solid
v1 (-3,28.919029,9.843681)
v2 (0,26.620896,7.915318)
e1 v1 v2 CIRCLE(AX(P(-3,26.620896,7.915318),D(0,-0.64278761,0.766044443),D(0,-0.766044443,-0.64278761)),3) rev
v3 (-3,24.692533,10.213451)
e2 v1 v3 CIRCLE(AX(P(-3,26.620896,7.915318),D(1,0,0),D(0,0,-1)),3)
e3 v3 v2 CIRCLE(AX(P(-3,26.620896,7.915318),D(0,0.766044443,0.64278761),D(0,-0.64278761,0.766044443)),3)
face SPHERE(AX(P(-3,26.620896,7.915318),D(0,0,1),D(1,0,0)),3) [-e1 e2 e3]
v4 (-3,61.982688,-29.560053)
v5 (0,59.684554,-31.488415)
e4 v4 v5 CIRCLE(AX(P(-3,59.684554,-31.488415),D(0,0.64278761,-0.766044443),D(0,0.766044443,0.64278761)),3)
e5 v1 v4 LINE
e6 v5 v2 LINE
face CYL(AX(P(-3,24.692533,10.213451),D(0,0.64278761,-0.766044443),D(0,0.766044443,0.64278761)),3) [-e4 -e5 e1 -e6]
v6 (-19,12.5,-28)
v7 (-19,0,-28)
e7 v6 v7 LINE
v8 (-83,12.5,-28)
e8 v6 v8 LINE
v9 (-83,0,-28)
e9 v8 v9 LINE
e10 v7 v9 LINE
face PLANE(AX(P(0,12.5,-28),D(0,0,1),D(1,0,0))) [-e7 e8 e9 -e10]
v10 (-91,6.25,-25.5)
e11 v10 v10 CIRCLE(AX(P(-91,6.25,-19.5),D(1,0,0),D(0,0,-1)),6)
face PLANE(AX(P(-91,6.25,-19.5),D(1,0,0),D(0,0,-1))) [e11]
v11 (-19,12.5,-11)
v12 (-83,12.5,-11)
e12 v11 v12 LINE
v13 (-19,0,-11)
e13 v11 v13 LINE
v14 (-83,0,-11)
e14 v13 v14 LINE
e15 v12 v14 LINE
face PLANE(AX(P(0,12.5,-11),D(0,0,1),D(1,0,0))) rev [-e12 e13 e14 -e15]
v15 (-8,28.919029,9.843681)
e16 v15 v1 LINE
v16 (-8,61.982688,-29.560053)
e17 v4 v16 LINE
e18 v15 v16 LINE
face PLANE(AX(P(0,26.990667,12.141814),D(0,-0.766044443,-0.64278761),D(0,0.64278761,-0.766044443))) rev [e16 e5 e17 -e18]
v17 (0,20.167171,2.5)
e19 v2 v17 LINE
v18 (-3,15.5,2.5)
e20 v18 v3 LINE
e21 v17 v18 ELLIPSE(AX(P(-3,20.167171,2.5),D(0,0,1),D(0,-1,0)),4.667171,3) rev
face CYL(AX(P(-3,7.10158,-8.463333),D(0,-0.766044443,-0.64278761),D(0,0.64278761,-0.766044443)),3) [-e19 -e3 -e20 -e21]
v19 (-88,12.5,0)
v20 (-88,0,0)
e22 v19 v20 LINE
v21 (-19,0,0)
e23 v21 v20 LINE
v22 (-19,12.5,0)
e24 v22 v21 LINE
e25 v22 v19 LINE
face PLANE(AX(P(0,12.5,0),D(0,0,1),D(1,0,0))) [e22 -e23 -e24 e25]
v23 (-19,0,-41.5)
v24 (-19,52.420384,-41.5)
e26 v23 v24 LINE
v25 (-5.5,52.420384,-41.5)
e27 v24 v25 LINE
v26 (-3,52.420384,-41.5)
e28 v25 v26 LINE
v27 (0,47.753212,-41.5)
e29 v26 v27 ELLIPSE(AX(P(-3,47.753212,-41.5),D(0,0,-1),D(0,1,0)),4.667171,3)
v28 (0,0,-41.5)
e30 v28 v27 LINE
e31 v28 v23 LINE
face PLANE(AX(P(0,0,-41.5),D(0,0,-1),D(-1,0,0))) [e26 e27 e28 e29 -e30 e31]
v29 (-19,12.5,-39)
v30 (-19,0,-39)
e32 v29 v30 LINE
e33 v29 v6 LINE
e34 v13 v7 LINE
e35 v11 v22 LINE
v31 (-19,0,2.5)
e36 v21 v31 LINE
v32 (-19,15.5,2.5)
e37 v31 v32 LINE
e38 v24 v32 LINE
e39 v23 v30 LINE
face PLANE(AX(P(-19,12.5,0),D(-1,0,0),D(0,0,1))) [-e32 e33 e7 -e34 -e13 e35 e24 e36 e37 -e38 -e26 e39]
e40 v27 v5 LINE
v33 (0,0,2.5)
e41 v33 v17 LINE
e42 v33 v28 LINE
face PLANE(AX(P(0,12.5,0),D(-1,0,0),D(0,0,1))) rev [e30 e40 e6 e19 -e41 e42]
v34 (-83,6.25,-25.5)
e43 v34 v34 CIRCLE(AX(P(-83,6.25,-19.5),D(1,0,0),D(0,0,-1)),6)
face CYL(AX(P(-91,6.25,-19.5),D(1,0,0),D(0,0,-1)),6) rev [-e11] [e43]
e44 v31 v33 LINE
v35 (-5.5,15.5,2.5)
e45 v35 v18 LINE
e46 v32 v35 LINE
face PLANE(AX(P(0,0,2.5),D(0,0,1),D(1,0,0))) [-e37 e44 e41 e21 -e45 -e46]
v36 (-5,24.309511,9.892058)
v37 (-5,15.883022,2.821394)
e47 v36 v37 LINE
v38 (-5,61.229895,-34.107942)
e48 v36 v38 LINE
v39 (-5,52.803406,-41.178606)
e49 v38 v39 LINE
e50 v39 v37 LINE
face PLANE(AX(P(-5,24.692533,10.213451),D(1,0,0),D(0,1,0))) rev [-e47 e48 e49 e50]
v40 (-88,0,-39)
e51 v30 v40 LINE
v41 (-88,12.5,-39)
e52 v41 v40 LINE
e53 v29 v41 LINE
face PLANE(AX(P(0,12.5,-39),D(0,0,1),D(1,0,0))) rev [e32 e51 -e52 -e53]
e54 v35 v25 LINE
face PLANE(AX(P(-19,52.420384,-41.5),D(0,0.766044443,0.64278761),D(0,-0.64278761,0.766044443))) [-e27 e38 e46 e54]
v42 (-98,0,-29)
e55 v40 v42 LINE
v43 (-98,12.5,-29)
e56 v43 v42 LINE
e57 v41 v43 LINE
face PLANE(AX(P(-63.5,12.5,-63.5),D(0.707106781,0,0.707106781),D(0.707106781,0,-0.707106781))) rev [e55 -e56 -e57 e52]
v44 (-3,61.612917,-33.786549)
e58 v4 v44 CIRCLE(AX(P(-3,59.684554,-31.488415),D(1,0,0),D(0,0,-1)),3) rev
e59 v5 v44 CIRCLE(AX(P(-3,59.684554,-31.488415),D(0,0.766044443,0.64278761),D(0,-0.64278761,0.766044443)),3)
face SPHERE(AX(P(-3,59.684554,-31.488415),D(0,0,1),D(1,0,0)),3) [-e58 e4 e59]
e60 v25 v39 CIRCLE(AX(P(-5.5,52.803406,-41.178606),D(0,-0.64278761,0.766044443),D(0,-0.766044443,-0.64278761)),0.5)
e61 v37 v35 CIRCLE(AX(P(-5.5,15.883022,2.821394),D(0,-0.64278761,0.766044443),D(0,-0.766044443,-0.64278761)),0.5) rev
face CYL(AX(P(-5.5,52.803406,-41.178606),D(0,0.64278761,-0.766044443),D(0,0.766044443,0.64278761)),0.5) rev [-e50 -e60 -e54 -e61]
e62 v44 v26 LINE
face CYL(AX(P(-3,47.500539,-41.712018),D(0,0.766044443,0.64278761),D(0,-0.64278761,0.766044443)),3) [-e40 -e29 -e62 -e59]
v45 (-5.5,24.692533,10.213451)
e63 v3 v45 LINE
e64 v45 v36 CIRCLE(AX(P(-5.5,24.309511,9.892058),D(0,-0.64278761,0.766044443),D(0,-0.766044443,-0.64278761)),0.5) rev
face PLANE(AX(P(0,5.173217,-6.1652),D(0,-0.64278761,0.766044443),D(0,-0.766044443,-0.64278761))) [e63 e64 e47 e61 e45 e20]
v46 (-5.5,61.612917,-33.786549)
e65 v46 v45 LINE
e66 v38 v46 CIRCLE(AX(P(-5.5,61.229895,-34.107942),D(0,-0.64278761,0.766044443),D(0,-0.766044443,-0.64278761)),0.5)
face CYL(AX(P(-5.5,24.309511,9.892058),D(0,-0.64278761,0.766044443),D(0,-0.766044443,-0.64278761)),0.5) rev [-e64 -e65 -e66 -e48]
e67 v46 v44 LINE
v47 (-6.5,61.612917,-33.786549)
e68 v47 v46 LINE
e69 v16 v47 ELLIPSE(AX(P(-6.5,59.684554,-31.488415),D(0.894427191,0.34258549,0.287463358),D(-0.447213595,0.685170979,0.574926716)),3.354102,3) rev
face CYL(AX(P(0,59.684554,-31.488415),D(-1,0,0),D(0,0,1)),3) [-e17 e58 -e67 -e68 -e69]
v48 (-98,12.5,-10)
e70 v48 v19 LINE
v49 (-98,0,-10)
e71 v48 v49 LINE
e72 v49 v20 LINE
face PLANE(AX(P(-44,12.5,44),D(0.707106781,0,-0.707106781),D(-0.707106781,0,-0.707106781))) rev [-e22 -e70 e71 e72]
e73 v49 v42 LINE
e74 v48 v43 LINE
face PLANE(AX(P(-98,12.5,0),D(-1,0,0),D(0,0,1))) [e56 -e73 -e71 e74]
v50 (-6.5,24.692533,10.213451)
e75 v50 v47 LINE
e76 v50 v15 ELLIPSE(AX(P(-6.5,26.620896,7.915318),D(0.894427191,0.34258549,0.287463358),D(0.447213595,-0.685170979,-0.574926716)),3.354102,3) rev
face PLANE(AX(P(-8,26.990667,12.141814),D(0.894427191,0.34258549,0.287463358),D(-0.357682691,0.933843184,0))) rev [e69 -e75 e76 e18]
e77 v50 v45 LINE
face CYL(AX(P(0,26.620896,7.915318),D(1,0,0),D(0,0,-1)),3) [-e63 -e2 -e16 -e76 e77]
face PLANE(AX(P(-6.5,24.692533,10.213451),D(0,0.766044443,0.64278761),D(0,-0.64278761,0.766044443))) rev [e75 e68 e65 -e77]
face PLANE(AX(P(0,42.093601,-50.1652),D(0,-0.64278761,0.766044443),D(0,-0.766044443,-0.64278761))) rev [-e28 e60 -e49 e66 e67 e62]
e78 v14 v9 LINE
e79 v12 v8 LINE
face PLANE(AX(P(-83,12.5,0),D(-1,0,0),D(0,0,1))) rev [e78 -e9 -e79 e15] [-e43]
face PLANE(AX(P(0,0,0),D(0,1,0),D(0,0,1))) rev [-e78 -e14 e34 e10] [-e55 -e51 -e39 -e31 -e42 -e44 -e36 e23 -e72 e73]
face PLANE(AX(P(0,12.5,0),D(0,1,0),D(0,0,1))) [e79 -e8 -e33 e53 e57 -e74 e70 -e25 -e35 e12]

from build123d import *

# Parameters (mm, degrees)
SKETCH1_W                = 64
SKETCH1_H                = 17
BOSS_EXTRUDE1_DEPTH      = 12.5
SKETCH2_R                = 6
CUT_EXTRUDE1_DEPTH       = 8
BOSS_EXTRUDE2_DEPTH      = 3
BOSS_EXTRUDE2_DEPTH_BACK = 12.5
SKETCH3_W                = 19
SKETCH3_H                = 44
BOSS_EXTRUDE3_DEPTH      = 19
BOSS_EXTRUDE4_DEPTH      = 57.437921
FILLET2_R                = 0.5
FILLET3_R                = 3


with BuildPart() as part:
    # Sketch1 → Boss-Extrude1 (new body)
    with BuildSketch(Plane(origin=(0, 0, 0), x_dir=(1, 0, 0), z_dir=(0, 1, 0))):
        Polygon((0, 39), (-88, 39), (-98, 29), (-98, 10), (-88, 0), (0, 0), align=None)
        with Locations((-51, 19.5)):
            Rectangle(SKETCH1_W, SKETCH1_H, mode=Mode.SUBTRACT)
    extrude(amount=BOSS_EXTRUDE1_DEPTH)

    # Sketch2 → Cut-Extrude1 (cut)
    with BuildSketch(Plane(origin=(-83, 0, 0), x_dir=(0, 0, -1), z_dir=(1, 0, 0))):
        with Locations((19.5, 6.25)):
            Circle(SKETCH2_R)
    extrude(amount=-CUT_EXTRUDE1_DEPTH, mode=Mode.SUBTRACT)

    # Sketch3 → Boss-Extrude2 (add, two sides: drawn at the far end of the back side and taken through both)
    with BuildSketch(Plane(origin=(0, 12.5, 0), x_dir=(1, 0, 0), z_dir=(0, 1, 0)).offset(-BOSS_EXTRUDE2_DEPTH_BACK)):
        with Locations((-9.5, 19.5)):
            Rectangle(SKETCH3_W, SKETCH3_H)
    extrude(amount=BOSS_EXTRUDE2_DEPTH + BOSS_EXTRUDE2_DEPTH_BACK)

    # Sketch4 → Boss-Extrude3 (add)
    with BuildSketch(Plane(origin=(0, 0, 0), x_dir=(0, 0, -1), z_dir=(1, 0, 0))):
        Polygon((41.5, 15.5), (41.5, 52.420383772), (-2.5, 15.5), align=None)
    extrude(amount=-BOSS_EXTRUDE3_DEPTH)

    # Sketch5 → Boss-Extrude4 (add)
    with BuildSketch(Plane(origin=(0, 52.420383772, -41.5), x_dir=(1, 0, 0), z_dir=(0, -0.6427876096865353, 0.7660444431189817))):
        Polygon((0, 0), (0, 15), (-8, 15), (-6.5, 12), (-5, 12), (-5, 0), align=None)
    extrude(amount=BOSS_EXTRUDE4_DEPTH)

    # Fillet2
    fillet2_edges = [part.edges().sort_by_distance(p)[0] for p in [
        (-5, 33.960191799, -19.499999897),
        (-5, 43.152725117, -11.786548581),
    ]]
    fillet(fillet2_edges, radius=FILLET2_R)

    # Fillet3
    fillet3_edges = [part.edges().sort_by_distance(p)[0] for p in [
        (-4, 63.911050419, -31.858185855),
        (0, 45.450858446, -9.858185752),
        (-4, 26.990666474, 12.141814352),
        (0, 21.24533315, 7.320907279),
        (0, 58.165717095, -36.679092927),
    ]]
    fillet(fillet3_edges, radius=FILLET3_R - 0.0001)  # a hair under: the kernel refuses the full size


solid = part.part
